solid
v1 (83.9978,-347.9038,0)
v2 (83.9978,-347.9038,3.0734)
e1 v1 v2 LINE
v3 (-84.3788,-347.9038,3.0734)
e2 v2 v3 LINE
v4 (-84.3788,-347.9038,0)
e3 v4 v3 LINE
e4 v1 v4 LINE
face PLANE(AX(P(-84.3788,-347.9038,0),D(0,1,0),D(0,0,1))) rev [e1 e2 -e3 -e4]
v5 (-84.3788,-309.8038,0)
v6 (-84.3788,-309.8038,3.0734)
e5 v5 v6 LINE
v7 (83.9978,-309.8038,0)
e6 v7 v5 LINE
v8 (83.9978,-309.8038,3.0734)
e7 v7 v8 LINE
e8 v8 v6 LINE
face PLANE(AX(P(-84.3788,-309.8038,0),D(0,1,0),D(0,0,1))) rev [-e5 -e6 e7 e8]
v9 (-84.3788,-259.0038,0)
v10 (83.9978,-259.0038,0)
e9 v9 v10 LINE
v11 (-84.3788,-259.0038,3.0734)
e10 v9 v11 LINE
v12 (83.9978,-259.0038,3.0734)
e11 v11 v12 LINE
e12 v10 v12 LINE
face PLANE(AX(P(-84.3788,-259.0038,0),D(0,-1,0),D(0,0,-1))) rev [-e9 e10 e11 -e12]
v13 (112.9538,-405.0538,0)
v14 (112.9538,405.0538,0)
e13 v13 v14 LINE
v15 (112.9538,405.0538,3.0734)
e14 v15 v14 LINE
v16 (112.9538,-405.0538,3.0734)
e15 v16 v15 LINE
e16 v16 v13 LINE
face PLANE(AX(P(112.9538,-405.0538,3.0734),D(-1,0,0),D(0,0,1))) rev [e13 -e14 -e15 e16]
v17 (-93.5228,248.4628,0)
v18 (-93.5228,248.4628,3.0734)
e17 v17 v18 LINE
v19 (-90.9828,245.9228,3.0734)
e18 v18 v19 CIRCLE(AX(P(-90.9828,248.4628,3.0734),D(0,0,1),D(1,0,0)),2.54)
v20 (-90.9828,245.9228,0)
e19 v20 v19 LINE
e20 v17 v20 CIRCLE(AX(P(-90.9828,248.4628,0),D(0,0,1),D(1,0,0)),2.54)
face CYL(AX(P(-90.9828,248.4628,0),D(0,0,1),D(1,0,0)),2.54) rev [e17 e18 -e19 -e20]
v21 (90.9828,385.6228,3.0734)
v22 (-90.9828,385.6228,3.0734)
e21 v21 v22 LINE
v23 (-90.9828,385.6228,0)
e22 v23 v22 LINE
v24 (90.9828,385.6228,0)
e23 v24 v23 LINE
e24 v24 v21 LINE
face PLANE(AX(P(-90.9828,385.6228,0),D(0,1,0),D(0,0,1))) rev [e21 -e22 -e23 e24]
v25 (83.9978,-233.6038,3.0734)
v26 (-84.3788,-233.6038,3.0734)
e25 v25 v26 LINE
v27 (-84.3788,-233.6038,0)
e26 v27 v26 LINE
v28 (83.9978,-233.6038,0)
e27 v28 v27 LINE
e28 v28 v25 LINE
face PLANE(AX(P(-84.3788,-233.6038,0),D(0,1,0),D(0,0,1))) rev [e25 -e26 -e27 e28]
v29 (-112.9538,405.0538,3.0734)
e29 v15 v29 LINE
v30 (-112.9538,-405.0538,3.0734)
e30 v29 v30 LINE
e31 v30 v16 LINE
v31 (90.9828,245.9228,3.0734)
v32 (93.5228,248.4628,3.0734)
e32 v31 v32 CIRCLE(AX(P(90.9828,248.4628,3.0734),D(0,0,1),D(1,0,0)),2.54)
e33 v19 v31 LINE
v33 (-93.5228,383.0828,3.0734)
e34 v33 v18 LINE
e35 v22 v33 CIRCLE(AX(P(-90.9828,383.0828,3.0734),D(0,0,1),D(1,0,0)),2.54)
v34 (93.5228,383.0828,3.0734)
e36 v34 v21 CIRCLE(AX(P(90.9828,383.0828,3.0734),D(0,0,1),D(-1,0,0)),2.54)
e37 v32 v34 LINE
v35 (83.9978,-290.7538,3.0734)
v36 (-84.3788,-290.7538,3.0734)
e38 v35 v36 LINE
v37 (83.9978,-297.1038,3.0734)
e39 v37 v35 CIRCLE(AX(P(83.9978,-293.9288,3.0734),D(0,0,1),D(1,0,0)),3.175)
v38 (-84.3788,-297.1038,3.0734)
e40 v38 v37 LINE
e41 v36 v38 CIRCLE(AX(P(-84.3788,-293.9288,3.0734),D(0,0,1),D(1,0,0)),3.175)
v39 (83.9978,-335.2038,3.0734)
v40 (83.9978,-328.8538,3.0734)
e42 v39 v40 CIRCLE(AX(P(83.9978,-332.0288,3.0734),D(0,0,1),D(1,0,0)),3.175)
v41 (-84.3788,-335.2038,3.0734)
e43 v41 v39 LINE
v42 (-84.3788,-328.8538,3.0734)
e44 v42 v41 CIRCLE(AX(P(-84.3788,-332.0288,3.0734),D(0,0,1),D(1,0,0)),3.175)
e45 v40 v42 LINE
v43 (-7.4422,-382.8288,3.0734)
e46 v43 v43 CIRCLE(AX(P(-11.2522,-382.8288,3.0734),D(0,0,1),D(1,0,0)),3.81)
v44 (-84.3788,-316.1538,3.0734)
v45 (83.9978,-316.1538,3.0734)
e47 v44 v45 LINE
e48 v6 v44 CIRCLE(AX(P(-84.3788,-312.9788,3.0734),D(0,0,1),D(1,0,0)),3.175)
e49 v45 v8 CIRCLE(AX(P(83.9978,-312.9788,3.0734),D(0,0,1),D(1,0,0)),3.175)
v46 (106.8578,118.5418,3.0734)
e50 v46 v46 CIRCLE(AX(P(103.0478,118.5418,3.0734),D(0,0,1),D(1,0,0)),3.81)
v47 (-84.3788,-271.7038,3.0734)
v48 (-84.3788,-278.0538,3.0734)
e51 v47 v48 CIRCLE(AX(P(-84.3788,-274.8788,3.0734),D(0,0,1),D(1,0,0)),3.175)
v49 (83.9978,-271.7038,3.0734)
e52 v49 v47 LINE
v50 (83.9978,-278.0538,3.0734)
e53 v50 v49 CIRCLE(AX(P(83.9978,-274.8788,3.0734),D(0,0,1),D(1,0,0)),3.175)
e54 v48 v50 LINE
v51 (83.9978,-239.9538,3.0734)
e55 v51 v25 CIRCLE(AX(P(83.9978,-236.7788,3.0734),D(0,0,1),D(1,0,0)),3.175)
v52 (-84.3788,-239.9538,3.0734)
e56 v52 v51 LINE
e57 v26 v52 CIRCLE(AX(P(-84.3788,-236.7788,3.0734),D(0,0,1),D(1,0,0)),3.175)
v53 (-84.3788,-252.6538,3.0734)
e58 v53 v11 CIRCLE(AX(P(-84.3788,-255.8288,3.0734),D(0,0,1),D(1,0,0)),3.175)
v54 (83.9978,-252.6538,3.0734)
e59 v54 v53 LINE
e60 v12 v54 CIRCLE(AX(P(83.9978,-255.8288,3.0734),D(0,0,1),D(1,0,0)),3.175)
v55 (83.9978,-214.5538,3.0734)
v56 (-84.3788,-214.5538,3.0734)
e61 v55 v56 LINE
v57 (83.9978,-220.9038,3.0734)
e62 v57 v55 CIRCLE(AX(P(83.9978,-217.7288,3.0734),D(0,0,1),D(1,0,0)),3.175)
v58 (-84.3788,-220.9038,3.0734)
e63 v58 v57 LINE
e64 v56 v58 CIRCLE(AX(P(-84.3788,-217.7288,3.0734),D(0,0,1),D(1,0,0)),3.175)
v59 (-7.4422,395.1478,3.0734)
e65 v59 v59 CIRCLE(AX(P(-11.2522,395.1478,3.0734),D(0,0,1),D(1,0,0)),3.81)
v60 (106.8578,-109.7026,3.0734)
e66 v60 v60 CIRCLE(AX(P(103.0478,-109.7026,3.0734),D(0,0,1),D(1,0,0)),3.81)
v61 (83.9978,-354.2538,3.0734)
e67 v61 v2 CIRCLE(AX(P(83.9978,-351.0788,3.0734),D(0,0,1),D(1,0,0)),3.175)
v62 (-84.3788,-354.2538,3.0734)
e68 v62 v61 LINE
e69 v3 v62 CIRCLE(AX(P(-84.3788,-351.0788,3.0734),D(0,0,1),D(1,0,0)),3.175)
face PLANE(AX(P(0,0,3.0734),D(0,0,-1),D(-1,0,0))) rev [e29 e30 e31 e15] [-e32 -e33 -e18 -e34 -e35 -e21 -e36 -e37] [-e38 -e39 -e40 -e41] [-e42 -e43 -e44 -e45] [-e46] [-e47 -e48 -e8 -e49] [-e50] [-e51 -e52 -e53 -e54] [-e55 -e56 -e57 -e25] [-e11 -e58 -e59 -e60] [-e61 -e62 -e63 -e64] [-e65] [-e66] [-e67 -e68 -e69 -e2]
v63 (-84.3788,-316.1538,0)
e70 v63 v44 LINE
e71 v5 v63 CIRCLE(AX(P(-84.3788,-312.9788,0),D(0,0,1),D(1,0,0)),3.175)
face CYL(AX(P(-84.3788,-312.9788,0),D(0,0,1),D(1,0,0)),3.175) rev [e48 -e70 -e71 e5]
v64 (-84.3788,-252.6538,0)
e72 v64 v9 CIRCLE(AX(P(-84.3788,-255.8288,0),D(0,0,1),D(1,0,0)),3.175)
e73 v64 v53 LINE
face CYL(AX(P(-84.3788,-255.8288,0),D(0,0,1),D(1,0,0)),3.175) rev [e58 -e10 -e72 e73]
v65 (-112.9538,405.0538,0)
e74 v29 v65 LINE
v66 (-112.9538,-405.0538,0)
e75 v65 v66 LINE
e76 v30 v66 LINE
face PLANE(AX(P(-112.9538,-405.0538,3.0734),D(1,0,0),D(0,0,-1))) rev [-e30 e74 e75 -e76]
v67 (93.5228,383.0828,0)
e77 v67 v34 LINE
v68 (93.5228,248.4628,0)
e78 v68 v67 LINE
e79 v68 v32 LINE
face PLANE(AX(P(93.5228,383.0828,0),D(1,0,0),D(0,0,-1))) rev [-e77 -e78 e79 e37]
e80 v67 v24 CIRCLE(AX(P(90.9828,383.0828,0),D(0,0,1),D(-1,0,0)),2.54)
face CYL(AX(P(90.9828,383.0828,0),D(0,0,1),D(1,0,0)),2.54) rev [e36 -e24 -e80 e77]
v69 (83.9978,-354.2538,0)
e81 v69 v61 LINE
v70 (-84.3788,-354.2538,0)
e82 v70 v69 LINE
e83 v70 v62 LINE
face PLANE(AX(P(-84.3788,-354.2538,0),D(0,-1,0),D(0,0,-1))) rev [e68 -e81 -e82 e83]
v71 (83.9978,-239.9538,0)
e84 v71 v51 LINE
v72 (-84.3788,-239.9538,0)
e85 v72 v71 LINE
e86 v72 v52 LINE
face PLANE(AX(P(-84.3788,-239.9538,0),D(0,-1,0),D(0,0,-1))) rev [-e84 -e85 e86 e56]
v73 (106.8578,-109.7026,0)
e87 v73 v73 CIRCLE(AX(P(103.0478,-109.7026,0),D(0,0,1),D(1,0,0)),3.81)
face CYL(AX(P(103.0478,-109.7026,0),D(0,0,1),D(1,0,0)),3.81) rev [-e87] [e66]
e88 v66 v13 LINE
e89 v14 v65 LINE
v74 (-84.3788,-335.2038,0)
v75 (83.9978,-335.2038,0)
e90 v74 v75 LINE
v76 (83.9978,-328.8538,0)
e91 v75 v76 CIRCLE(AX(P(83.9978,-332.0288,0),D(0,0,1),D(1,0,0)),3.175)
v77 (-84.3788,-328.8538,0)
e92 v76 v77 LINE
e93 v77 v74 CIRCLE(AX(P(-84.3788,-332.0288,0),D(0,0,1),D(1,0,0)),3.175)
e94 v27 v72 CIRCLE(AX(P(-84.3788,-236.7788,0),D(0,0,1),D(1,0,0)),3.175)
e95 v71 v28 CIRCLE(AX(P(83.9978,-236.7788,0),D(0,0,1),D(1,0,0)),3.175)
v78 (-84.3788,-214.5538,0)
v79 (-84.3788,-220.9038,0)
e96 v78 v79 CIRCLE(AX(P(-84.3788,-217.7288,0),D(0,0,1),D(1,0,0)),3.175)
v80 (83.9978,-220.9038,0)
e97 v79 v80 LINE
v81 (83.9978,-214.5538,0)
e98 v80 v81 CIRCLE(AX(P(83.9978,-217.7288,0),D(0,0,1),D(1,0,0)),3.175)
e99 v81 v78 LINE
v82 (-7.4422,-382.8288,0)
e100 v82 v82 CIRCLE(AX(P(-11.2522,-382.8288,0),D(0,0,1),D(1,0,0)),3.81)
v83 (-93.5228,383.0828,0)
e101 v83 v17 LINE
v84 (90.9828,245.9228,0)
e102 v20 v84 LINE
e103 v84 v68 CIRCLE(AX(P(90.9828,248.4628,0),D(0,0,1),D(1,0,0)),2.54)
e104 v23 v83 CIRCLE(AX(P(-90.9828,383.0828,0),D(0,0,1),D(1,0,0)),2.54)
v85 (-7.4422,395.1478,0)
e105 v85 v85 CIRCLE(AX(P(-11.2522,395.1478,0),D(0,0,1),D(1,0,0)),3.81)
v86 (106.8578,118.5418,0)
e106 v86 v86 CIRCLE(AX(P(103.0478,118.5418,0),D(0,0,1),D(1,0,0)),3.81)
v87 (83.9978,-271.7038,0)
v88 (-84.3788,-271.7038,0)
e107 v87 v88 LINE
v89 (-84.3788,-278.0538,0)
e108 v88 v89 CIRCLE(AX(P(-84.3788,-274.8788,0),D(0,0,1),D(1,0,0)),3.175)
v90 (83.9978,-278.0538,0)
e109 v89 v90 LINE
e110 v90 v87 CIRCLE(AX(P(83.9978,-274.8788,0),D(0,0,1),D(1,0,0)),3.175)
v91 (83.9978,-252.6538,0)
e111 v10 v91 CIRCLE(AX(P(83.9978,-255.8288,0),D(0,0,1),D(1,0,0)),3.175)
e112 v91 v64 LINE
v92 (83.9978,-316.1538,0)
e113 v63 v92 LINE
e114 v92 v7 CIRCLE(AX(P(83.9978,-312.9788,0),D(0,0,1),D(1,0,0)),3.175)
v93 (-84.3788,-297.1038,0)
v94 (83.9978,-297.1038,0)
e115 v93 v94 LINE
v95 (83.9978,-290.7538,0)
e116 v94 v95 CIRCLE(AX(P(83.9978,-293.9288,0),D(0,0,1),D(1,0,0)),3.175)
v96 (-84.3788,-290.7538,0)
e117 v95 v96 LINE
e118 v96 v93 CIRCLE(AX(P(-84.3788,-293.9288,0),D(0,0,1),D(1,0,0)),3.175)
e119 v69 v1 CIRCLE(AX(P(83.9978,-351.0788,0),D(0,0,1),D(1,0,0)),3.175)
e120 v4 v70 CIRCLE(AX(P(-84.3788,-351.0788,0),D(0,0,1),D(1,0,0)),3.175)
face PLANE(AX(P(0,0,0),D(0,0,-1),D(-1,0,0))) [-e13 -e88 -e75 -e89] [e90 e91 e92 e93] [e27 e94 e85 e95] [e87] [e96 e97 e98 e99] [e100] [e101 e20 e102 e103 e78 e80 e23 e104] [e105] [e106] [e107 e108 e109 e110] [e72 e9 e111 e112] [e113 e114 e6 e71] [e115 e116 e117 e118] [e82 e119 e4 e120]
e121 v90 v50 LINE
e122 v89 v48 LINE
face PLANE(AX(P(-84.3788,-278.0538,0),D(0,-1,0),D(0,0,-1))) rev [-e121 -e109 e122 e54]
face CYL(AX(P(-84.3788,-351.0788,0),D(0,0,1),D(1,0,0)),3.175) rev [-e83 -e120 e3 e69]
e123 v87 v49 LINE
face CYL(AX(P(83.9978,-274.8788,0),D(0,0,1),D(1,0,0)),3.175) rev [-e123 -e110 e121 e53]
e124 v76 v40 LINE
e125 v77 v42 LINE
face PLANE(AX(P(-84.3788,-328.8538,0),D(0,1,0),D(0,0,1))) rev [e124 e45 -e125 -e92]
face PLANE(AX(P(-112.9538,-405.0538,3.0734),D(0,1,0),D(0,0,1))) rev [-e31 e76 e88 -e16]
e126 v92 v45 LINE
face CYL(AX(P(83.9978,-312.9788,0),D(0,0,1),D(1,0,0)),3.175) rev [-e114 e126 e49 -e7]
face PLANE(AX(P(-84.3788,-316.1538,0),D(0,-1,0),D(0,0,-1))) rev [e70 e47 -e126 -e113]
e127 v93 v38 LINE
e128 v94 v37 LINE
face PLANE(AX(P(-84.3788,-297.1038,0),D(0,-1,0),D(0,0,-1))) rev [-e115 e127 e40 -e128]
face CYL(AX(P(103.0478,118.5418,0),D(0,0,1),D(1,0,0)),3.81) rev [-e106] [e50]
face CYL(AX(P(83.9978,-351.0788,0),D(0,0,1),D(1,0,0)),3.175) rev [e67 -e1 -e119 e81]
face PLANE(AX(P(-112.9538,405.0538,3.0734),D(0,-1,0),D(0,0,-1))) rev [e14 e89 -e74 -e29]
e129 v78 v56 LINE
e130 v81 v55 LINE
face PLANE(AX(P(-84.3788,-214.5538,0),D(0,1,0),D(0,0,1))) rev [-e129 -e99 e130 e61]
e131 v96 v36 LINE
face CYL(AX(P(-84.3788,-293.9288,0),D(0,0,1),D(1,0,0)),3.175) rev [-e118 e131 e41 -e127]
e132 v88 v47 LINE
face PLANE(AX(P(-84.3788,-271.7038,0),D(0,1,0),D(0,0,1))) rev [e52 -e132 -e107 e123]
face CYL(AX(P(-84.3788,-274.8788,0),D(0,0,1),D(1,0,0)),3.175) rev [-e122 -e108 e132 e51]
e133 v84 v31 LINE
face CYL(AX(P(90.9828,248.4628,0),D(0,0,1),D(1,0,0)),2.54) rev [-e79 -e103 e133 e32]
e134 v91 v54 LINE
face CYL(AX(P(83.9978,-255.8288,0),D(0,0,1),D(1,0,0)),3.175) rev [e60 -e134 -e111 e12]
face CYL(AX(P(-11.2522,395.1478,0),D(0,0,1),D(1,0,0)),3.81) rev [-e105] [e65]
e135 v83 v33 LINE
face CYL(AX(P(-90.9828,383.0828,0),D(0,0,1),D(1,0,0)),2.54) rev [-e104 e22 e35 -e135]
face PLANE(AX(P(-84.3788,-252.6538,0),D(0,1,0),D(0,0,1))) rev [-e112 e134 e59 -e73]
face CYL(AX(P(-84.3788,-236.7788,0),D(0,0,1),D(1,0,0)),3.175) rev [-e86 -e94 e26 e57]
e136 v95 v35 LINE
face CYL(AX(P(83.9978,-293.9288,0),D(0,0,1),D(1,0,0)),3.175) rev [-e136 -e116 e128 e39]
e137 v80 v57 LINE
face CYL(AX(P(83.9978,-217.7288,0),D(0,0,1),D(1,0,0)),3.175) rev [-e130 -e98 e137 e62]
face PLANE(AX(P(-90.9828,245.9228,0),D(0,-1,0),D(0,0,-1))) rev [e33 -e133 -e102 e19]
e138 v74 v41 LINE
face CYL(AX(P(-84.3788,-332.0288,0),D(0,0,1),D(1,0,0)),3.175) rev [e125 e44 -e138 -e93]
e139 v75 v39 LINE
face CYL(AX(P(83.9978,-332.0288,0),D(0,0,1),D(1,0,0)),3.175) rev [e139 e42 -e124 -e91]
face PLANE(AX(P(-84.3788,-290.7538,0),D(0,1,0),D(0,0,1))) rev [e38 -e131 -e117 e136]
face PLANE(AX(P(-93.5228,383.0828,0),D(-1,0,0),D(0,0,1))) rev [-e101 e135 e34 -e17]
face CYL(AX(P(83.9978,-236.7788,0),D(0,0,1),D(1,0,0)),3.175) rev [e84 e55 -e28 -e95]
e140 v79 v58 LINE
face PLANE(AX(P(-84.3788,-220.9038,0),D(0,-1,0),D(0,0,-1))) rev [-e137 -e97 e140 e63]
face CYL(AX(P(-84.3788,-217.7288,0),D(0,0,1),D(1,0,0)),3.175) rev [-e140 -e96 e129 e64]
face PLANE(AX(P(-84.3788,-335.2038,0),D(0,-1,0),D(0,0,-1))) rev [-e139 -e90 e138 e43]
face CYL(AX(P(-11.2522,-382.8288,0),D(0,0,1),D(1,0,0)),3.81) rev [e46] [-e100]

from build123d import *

# Parameters (mm, degrees)
SKETCH1_W           = 225.9076
SKETCH1_H           = 810.1076
BOSS_EXTRUDE1_DEPTH = 3.0734
VENTMASTER_DEPTH    = 421.519425968
LPATTERN1_COUNT     = 8
LPATTERN1_PITCH     = 19.05
CUT_EXTRUDE2_DEPTH  = 3.0734
SKETCH4_R           = 3.81
CUT_EXTRUDE3_DEPTH  = 421.519425968


# Read off the part's stored shape, not the designer's step: Cut-Extrude2
with BuildPart() as part:
    # Sketch1 → Boss-Extrude1 (new body)
    with BuildSketch(Plane.XY):
        Rectangle(SKETCH1_W, SKETCH1_H)
    extrude(amount=BOSS_EXTRUDE1_DEPTH)

    # Sketch2 → VentMaster (cut, through all)
    with BuildSketch(Plane.XY.offset(3.0734)):
        with BuildLine():
            Line((-84.3788, -347.9038), (83.9978, -347.9038))
            ThreePointArc((83.9978, -347.9038), (87.1728, -351.0788), (83.9978, -354.2538))
            Line((83.9978, -354.2538), (-84.3788, -354.2538))
            ThreePointArc((-84.3788, -354.2538), (-87.5538, -351.0788), (-84.3788, -347.9038))
        make_face()
    ventmaster = extrude(amount=-VENTMASTER_DEPTH, mode=Mode.SUBTRACT)

    # LPattern1: VentMaster ×8
    with Locations(*[(0, i * LPATTERN1_PITCH, 0) for i in range(1, LPATTERN1_COUNT)]):
        add(ventmaster, mode=Mode.SUBTRACT)

    # Cut-Extrude2 outline → Cut-Extrude2 (cut)
    with BuildSketch(Plane.XY):
        with BuildLine():
            Line((-93.5228, 383.0828), (-93.5228, 248.4628))
            ThreePointArc((-93.5228, 248.4628), (-92.778851224, 246.666748776), (-90.9828, 245.9228))
            Line((-90.9828, 245.9228), (90.9828, 245.9228))
            ThreePointArc((90.9828, 245.9228), (92.778851224, 246.666748776), (93.5228, 248.4628))
            Line((93.5228, 248.4628), (93.5228, 383.0828))
            ThreePointArc((93.5228, 383.0828), (92.778851224, 384.878851224), (90.9828, 385.6228))
            Line((90.9828, 385.6228), (-90.9828, 385.6228))
            ThreePointArc((-90.9828, 385.6228), (-92.778851224, 384.878851224), (-93.5228, 383.0828))
        make_face()
    extrude(amount=CUT_EXTRUDE2_DEPTH, mode=Mode.SUBTRACT)

    # Sketch4 → Cut-Extrude3 (cut, through all)
    with BuildSketch(Plane.XY.offset(3.0734)):
        with Locations((-11.2522, 395.1478)):
            Circle(SKETCH4_R)
        with Locations((-11.2522, -382.8288)):
            Circle(SKETCH4_R)
        with Locations((103.0478, -109.7026)):
            Circle(SKETCH4_R)
        with Locations((103.0478, 118.5418)):
            Circle(SKETCH4_R)
    extrude(amount=-CUT_EXTRUDE3_DEPTH, mode=Mode.SUBTRACT)


solid = part.part
